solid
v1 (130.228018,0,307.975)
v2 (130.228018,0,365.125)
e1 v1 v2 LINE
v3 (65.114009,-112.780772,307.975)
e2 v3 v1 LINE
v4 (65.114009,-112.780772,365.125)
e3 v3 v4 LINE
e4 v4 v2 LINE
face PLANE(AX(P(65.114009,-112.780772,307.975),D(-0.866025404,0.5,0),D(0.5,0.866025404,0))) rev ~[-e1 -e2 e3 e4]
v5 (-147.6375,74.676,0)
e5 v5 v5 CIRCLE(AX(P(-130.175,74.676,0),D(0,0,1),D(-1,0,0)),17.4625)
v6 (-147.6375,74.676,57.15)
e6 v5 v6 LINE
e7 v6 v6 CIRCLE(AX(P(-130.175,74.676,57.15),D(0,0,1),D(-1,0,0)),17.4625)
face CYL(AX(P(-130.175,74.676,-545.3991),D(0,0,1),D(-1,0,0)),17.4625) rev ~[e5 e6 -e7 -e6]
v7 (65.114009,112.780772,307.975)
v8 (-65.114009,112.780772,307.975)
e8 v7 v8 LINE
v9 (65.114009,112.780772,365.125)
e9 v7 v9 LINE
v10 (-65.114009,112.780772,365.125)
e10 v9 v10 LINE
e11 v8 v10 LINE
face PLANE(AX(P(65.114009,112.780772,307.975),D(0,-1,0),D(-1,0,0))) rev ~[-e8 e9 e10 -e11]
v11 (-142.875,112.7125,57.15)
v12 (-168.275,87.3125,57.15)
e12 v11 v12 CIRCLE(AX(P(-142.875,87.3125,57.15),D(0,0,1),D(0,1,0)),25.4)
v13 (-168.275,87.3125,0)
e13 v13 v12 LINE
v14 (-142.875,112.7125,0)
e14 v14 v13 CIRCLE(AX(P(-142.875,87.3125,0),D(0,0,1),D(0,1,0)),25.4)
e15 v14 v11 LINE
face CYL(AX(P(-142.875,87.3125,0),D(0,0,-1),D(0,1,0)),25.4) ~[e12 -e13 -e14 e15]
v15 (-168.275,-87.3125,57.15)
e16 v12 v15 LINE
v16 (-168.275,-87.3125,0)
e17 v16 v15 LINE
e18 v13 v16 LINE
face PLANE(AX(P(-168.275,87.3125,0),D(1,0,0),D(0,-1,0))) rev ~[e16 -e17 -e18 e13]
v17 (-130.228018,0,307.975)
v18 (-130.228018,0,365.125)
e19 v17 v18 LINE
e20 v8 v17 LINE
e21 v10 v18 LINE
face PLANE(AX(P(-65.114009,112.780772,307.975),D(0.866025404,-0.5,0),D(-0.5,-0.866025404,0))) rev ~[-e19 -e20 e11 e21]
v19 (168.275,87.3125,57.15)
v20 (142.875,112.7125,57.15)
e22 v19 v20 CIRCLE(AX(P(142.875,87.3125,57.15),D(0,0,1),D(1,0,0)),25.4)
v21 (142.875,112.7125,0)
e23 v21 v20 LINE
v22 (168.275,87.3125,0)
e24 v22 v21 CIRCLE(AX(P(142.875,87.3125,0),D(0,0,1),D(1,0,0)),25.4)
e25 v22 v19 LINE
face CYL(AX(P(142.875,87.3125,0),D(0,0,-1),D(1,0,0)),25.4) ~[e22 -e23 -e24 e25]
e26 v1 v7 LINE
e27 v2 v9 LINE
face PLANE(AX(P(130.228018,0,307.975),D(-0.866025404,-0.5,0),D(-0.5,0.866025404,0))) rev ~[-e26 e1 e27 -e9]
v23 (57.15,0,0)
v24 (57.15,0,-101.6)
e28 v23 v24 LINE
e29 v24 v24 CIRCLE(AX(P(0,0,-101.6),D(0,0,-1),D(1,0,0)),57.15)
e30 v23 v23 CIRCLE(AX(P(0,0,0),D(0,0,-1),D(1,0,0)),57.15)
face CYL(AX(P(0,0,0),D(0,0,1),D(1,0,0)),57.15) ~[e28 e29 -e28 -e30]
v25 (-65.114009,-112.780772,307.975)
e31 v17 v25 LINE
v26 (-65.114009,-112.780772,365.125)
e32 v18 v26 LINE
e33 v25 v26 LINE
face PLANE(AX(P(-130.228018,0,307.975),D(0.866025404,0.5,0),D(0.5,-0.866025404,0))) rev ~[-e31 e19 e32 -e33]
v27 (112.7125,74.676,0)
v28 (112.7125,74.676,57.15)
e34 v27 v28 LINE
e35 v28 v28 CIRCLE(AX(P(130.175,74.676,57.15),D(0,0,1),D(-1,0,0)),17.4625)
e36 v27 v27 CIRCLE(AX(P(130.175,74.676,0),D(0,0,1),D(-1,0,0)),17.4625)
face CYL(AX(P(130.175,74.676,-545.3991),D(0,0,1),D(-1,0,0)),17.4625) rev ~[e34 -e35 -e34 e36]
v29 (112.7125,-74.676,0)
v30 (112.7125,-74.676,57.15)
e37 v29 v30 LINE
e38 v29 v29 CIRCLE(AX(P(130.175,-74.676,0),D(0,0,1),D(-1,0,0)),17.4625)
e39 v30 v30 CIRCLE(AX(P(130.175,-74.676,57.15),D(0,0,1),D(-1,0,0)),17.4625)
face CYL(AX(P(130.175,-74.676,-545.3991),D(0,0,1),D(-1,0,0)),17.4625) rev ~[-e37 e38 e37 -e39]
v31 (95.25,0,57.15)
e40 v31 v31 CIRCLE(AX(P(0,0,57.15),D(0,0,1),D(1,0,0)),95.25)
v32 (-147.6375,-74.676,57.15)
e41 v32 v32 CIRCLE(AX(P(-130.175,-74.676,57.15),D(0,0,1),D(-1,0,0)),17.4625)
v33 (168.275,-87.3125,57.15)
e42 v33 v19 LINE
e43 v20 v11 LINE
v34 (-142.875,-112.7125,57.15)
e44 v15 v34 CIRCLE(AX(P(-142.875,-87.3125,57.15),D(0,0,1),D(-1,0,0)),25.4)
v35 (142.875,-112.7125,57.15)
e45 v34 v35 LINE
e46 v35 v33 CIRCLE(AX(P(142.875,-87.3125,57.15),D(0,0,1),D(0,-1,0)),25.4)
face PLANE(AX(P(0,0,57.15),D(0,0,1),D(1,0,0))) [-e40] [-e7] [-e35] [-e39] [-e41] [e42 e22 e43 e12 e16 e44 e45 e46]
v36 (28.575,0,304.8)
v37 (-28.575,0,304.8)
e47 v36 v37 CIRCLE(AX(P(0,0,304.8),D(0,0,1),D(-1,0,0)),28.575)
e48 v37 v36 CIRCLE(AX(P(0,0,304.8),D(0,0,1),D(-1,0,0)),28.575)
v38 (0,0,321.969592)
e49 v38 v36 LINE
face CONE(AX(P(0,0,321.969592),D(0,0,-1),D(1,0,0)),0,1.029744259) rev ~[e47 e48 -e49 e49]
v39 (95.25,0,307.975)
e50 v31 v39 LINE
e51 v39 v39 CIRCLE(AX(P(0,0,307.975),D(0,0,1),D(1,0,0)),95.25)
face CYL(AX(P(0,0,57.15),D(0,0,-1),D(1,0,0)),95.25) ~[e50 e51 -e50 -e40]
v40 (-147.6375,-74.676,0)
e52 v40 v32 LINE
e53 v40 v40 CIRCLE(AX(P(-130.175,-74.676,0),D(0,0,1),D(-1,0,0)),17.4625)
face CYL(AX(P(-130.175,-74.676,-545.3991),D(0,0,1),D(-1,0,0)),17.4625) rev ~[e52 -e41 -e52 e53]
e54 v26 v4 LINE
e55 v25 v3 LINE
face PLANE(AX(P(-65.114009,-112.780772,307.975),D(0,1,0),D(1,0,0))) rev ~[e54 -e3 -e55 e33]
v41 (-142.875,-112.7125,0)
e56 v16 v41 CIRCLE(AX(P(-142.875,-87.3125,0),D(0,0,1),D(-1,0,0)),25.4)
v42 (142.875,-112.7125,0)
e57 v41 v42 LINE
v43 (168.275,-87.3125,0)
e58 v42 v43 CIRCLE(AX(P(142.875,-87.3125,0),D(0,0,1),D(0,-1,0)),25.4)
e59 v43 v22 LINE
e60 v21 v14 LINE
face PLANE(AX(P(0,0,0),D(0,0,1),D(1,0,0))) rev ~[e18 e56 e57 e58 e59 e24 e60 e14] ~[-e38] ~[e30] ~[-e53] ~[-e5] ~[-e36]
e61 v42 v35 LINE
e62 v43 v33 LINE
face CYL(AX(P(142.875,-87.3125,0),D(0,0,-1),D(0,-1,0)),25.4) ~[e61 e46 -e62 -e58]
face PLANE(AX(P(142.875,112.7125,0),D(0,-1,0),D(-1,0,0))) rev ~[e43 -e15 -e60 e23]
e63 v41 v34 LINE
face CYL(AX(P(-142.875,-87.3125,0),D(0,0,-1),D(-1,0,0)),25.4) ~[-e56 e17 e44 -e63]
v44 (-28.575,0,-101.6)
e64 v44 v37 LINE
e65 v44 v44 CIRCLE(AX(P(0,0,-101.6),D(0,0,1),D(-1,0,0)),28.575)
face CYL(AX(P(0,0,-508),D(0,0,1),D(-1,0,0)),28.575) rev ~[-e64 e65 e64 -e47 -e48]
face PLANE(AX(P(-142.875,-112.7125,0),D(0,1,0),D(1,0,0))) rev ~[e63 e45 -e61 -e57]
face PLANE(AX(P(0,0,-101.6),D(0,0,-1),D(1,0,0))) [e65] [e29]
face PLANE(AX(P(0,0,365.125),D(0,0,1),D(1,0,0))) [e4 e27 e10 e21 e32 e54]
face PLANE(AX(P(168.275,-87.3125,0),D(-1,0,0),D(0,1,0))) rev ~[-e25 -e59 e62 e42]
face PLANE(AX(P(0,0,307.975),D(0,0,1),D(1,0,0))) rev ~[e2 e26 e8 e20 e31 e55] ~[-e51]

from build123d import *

# Parameters (mm, degrees)
F1_DEPTH  = 57.15
F2_R      = 95.25
F3_DEPTH  = 250.825
F5_DEPTH  = 57.15
F7_D      = 34.925
F8_R      = 57.15
F9_DEPTH  = 101.6
F11_D     = 57.15
F11_DEPTH = 406.4
F11_TIP   = 17.1695921887


with BuildPart() as f1:
    # F0 (on Top) → F1 (new body)
    with BuildSketch(Plane.XY):
        with BuildLine():
            Line((142.875, 112.7125), (-142.875, 112.7125))
            ThreePointArc((-142.875, 112.7125), (-160.8355122421, 105.2730122421), (-168.275, 87.3125))
            Line((-168.275, 87.3125), (-168.275, -87.3125))
            ThreePointArc((-168.275, -87.3125), (-160.8355122421, -105.2730122421), (-142.875, -112.7125))
            Line((-142.875, -112.7125), (142.875, -112.7125))
            ThreePointArc((142.875, -112.7125), (160.8355122421, -105.2730122421), (168.275, -87.3125))
            Line((168.275, -87.3125), (168.275, 87.3125))
            ThreePointArc((168.275, 87.3125), (160.8355122421, 105.2730122421), (142.875, 112.7125))
        make_face()
    extrude(amount=F1_DEPTH)

    # F2 (on face) → F3 (join)
    with BuildSketch(Plane.XY.offset(57.15)):
        Circle(F2_R)
    extrude(amount=F3_DEPTH)

    # F4 (on face) → F5 (join)
    with BuildSketch(Plane.XY.offset(307.975)):
        Polygon((65.11400916, 112.7807721496), (-65.11400916, 112.7807721496), (-130.2280183199, 0), (-65.11400916, -112.7807721496), (65.11400916, -112.7807721496), (130.2280183199, 0), align=None)
    extrude(amount=F5_DEPTH)

    # F7 (through all)
    with Locations(Plane(origin=(0, 0, 0), x_dir=(1, 0, 0), z_dir=(0, 0, -1))):
        with Locations((-130.175, 74.676), (-130.175, -74.676), (130.175, -74.676), (130.175, 74.676)):
            Hole(F7_D / 2)

    # F8 (on face) → F9 (join)
    with BuildSketch(Plane(origin=(0, 0, 0), x_dir=(1, 0, 0), z_dir=(0, 0, -1))):
        Circle(F8_R)
    extrude(amount=F9_DEPTH)

    # F11
    with Locations(Plane(origin=(0, 0, -101.6), x_dir=(1, 0, 0), z_dir=(0, 0, -1))):
        with Locations((0, 0)):
            Hole(F11_D / 2, depth=F11_DEPTH)
            with Locations((0, 0, -(F11_DEPTH + F11_TIP / 2))):  # 118° drill point
                Cone(0, F11_D / 2, F11_TIP, mode=Mode.SUBTRACT)


solid = f1.part
